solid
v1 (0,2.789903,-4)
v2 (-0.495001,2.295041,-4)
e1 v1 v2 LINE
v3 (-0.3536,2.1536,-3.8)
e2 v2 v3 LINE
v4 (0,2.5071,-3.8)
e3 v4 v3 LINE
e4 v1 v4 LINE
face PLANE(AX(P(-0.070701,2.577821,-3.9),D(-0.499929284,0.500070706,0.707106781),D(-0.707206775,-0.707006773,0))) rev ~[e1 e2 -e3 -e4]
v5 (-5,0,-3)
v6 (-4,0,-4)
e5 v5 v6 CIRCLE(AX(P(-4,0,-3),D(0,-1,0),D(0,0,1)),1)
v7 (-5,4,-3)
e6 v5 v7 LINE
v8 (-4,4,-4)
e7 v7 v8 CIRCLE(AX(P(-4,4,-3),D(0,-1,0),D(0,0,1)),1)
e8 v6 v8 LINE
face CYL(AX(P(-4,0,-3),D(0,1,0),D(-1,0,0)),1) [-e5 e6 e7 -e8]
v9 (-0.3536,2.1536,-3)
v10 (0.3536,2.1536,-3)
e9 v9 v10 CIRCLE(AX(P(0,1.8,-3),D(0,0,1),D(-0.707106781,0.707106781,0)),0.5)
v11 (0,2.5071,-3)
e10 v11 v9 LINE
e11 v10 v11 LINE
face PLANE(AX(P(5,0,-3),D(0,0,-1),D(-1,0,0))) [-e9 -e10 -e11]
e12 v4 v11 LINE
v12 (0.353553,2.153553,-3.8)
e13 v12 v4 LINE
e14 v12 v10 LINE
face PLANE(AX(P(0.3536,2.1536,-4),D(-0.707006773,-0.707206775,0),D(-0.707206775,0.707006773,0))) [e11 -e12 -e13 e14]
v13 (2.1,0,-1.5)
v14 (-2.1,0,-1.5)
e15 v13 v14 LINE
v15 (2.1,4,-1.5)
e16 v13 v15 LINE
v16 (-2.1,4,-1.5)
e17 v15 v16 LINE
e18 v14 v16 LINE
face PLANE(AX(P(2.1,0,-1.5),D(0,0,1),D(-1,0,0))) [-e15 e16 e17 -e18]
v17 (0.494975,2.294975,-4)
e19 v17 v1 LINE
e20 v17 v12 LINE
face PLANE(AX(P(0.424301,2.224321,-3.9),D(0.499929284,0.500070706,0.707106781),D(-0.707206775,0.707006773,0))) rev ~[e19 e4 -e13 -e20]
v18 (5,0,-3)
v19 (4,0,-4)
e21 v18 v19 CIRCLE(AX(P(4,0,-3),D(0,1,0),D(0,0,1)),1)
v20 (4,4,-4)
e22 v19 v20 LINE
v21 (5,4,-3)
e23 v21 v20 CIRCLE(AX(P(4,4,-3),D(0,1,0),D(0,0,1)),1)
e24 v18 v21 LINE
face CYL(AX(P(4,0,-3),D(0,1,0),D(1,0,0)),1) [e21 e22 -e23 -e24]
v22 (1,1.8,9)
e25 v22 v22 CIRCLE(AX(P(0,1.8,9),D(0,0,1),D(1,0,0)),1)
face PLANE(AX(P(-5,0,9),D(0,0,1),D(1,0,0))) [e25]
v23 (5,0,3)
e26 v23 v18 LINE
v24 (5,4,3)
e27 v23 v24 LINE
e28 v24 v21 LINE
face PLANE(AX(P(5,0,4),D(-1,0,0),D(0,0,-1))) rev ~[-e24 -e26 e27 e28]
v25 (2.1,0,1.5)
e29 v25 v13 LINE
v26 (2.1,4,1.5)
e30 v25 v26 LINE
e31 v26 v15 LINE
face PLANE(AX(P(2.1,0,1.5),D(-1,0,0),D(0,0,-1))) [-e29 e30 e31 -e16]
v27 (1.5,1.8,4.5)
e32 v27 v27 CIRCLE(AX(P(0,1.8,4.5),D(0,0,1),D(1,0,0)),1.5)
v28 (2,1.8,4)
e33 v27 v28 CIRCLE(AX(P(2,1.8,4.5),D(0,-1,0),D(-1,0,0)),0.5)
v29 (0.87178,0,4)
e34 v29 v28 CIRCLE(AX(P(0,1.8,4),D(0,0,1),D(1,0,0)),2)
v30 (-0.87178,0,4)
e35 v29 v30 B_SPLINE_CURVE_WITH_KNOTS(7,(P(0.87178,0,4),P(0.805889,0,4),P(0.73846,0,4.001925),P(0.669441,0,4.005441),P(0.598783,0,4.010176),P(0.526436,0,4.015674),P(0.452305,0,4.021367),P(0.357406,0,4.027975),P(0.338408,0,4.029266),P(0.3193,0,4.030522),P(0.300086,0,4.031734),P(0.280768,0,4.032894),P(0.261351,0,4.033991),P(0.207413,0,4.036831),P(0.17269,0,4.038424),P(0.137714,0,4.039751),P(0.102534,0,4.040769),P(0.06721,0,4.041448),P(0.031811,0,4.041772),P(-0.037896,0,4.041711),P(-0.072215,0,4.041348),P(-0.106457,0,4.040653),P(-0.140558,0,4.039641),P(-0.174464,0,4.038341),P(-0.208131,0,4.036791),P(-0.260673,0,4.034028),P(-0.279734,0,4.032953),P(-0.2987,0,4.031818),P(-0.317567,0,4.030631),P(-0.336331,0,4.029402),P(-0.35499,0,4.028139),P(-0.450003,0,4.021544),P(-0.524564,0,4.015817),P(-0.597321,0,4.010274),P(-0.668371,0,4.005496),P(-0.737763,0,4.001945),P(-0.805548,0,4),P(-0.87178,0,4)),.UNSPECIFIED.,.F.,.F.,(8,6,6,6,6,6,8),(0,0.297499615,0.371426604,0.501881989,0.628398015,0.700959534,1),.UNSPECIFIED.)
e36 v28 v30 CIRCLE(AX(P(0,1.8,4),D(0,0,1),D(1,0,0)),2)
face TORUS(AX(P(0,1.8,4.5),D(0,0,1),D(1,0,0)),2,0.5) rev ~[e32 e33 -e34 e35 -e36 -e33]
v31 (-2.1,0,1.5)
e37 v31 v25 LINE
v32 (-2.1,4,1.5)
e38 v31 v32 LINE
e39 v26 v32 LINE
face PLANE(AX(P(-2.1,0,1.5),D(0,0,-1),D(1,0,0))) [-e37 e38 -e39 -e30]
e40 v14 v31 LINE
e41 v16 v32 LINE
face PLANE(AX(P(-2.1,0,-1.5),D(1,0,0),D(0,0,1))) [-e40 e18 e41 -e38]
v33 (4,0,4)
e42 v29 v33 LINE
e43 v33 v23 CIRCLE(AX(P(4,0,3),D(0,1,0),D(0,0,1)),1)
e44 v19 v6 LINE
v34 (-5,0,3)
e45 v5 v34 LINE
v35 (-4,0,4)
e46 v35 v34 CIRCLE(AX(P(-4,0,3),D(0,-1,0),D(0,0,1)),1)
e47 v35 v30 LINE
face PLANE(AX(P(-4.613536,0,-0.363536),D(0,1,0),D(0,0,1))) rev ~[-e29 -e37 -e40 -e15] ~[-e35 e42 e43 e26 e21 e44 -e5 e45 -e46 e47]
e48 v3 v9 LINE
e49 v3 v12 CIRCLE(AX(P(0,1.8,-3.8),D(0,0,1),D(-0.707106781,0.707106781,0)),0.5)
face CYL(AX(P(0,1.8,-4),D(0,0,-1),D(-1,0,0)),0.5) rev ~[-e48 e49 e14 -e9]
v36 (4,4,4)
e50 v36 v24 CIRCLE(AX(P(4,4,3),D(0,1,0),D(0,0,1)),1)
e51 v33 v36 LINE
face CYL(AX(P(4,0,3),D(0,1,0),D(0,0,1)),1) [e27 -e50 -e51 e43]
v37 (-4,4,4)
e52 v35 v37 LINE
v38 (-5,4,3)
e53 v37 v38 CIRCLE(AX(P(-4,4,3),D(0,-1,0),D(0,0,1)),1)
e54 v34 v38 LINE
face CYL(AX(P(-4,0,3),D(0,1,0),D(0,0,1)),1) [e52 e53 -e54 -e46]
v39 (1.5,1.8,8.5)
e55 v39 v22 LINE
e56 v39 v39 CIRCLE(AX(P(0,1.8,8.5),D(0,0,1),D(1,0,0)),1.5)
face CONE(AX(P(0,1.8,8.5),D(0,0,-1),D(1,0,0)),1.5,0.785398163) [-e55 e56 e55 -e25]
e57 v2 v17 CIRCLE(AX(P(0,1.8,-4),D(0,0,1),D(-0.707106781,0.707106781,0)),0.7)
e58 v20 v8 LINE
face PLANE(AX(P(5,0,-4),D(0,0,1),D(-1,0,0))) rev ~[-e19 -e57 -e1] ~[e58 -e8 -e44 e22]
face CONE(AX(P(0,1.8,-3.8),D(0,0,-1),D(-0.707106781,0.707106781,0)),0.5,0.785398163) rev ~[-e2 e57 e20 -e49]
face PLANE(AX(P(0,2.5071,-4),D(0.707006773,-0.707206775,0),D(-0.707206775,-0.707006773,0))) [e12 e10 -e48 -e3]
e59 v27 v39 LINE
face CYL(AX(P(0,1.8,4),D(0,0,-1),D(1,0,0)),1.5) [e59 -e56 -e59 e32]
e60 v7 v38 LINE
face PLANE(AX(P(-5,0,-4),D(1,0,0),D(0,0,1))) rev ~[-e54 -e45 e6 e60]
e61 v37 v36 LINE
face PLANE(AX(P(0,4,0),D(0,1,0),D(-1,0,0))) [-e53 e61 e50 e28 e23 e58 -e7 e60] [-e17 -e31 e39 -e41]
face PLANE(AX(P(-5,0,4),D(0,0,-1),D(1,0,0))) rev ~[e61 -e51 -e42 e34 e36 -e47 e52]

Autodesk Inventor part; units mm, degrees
ref_plane "YZ Plane" through (0, 0, 0) normal (1, 0, 0) x (0, 1, 0)
ref_plane "XZ Plane" through (0, 0, 0) normal (0, 1, 0) x (-1, 0, 0)
ref_plane "XY Plane" through (0, 0, 0) normal (0, 0, 1) x (1, 0, 0)
sketch "Sketch1" plane through (0, 0, 0) normal (0, 1, 0) x (-1, 0, 0)
  line L0 (2.1, 1.5) -> (-2.1, 1.5)
  line L1 (-2.1, -1.5) -> (2.1, -1.5)
  line L2 (7, 0) -> (-7, 0) construction
  line L3 (0, -5.6) -> (0, 5.6) construction
  line L4 (5, 4) -> (-5, 4)
  line L5 (-5, 4) -> (-5, -4)
  line L6 (-5, -4) -> (5, -4)
  line L7 (5, -4) -> (5, 4)
  line L8 (-2, 0.84) -> (-2, -0.76) projected
  line L9 (2, -0.76) -> (2, 0.84) projected
  line L10 (-2.1, 1.5) -> (-2.1, -1.5)
  line L11 (2.1, -1.5) -> (2.1, 1.5)
  line L12 (0.2, 1.5) -> (-0.2, 1.5) projected
  point P0 (0, 0)
  point P1 (2.3, 0)
  point P2 (0, 1.5)
  dimension "d2" = 3
  dimension "d3" = 10
  dimension "d16" = 2.5
  dimension "d17" = 2.5
  dimension "d29" = 0.1
  dimension "d30" = 0.1
extrude "Extrusion1" add sketch "Sketch1" along normal blind 4
sketch "Sketch2" plane through (-5, 0, 4) normal (0, 0, 1) x (1, 0, 0)
  circle A0 centre (5, 1.8) radius 1.5
  line L0 (0, 4) -> (10, 4) construction
  line L1 (5, -1.76) -> (5, 10.56) construction
  line L2 (0, 0) -> (0, 4) projected
  arc A1 (7, 8.5082) -> (3, 8.5082) centre (5, 1.8) ccw projected
  point P0 (5, 0)
  point P1 (0, 2)
  dimension "d7" = 3
extrude "Extrusion2" add sketch "Sketch2" along normal blind 5
sketch "Sketch4" plane through (5, 0, -4) normal (0, 0, -1) x (-1, 0, 0)
  circle A0 centre (5, 1.8) radius 0.2 construction
  circle A1 centre (5, 1.8) radius 0.5
  line L0 (4.6464, 2.1536) -> (5, 2.5071)
  line L1 (5, 2.5071) -> (5.3536, 2.1536)
  point P0 (5, 0)
  dimension "d18" = 1
extrude "Extrusion4" cut sketch "Sketch4" against normal blind 1
chamfer "Chamfer2" distance 0.2 angle 45 3 edges at (-0.1768, 2.3303, -4) (0, 1.3, -4) (0.1768, 2.3303, -4)
chamfer "Chamfer3" distance 0.5 angle 45 1 edges at (-1.5, 1.8, 9)
fillet "Fillet1" radius 0.5 1 edges at (-1.5, 1.8, 4)
fillet "Fillet2" radius 1 4 edges at (-5, 2, 4) (-5, 2, -4) (5, 2, -4) (5, 2, 4)
properties part number "Pen_nib_stopper"
